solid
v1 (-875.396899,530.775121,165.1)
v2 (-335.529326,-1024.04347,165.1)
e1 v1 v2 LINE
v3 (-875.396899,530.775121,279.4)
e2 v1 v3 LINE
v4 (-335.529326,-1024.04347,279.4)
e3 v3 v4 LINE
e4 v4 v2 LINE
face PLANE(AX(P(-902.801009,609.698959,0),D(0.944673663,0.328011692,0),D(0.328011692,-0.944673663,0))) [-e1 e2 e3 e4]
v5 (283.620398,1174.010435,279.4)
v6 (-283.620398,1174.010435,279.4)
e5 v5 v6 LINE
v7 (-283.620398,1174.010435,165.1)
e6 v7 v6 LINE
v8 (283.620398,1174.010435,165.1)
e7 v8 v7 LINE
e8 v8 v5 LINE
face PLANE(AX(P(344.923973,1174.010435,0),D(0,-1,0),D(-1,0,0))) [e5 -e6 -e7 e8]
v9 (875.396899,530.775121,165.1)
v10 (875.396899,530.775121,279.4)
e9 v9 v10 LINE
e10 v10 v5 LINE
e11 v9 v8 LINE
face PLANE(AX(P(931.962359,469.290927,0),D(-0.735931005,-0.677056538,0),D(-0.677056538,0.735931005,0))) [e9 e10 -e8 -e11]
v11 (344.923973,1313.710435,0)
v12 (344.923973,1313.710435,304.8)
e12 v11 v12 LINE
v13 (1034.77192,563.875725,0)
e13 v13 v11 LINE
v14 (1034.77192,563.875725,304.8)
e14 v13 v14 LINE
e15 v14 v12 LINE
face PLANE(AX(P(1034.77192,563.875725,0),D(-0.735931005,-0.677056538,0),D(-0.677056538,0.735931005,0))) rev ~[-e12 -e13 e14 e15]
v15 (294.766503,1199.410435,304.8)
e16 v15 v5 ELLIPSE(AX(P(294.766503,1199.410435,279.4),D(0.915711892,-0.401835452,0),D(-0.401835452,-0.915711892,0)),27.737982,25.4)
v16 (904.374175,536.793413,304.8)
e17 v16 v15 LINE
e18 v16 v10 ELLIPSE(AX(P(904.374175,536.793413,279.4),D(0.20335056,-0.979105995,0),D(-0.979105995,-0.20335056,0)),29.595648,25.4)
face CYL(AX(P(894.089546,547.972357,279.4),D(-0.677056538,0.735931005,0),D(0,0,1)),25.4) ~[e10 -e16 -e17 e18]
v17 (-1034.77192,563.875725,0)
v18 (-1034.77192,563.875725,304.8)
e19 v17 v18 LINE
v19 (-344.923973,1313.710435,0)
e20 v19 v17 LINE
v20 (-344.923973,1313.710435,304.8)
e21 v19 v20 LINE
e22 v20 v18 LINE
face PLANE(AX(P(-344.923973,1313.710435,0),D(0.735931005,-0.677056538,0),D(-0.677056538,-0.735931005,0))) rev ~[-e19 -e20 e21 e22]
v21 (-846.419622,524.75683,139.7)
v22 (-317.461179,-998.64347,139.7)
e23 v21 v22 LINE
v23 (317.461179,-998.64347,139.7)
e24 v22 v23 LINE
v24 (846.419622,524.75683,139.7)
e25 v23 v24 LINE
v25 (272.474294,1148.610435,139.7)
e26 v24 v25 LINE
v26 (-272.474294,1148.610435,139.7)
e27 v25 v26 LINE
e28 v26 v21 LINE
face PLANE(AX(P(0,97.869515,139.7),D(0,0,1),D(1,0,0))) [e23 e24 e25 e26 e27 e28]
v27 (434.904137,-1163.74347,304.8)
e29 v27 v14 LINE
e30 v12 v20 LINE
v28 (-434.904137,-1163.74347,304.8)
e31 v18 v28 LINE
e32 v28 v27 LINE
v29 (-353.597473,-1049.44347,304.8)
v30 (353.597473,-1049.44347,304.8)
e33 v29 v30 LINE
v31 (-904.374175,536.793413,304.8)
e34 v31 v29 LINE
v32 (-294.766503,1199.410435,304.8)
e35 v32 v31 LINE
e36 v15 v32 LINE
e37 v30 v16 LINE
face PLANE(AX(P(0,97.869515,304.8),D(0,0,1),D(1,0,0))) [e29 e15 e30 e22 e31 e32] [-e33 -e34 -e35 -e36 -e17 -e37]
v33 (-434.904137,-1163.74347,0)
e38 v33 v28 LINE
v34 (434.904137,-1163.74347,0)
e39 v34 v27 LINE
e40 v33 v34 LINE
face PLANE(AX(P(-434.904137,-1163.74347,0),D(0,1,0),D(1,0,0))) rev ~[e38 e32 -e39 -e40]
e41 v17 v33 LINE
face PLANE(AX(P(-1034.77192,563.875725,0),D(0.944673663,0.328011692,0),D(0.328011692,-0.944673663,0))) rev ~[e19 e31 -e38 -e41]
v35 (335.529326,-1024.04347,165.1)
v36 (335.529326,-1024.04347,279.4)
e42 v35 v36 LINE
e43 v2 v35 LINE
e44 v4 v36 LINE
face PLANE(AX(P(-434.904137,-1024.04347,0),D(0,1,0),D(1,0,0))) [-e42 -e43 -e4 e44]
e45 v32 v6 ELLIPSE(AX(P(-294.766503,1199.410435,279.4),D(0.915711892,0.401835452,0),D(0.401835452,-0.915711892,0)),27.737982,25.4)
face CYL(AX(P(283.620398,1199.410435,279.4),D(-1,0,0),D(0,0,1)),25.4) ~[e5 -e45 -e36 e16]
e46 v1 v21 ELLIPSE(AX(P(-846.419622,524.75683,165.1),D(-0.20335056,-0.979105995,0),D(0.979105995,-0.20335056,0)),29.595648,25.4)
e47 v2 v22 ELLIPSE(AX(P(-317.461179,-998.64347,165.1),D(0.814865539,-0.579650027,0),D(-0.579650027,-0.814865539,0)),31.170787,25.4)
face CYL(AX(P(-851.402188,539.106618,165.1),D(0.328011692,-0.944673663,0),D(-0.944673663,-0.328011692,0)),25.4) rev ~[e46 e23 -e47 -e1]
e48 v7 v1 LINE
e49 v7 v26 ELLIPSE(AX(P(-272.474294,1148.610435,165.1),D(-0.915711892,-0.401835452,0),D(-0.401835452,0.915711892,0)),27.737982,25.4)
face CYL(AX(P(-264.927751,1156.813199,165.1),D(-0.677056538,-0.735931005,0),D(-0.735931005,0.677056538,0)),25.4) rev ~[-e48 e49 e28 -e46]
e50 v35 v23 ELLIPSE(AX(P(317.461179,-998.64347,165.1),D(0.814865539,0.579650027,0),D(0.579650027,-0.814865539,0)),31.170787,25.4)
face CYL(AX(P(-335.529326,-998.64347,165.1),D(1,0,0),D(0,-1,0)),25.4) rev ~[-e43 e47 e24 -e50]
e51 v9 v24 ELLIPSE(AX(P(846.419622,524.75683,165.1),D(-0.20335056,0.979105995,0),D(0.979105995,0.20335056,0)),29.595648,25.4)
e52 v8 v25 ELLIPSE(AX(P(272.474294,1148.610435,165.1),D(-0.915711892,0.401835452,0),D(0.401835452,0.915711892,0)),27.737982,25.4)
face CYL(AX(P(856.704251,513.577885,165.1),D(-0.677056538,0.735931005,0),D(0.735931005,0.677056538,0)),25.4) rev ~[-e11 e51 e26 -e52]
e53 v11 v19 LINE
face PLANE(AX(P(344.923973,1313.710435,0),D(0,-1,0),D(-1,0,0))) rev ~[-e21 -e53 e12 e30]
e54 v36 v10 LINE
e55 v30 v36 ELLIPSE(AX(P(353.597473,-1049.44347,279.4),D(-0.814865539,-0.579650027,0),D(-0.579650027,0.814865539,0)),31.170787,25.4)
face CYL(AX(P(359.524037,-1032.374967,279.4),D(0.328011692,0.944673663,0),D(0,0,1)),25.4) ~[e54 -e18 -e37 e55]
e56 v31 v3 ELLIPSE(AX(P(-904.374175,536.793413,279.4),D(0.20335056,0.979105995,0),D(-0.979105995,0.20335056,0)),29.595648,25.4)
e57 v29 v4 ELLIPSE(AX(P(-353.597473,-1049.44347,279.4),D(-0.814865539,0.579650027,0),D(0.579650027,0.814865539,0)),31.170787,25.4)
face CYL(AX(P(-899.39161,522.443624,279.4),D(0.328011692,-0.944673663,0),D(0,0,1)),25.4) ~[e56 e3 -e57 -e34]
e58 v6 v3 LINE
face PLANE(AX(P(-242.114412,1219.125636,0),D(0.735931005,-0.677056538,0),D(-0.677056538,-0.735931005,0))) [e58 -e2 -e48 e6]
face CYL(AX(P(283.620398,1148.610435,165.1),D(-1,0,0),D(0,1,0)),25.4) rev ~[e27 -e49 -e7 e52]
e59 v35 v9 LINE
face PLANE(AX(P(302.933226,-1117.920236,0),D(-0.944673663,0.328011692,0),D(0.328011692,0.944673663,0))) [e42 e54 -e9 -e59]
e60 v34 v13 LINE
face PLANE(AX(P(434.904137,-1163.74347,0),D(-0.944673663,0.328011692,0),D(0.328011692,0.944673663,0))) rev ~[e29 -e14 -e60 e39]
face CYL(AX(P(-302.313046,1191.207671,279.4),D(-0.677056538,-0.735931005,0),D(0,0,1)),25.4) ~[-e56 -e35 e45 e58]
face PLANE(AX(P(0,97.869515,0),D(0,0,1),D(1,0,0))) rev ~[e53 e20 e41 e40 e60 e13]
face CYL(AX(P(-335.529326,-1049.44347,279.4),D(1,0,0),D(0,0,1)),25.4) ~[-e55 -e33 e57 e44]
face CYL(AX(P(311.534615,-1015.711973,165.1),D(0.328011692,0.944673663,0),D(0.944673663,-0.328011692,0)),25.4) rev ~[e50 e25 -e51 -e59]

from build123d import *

# Parameters (mm, degrees)
F1_DEPTH = 304.8
F2_T     = -139.7
F3_R     = 25.4


# Not quite as in the source:
# - a feature of the source that left no trace in its solid (it failed there, or was rolled back) is left out


with BuildPart() as f1:
    # F0 (on Top) → F1 (new body)
    with BuildSketch(Plane.XY):
        Polygon((-434.9041368839, -1163.7434696012), (0, -1163.7434696012), (434.9041368839, -1163.7434696012), (1034.7719199285, 563.8757253794), (344.9239733095, 1313.7104347737), (0, 1313.7104347737), (-344.9239733095, 1313.7104347737), (-1034.7719199285, 563.8757253794), align=None)
    extrude(amount=F1_DEPTH)

    # F2
    f2_openings = [f1.faces().sort_by_distance(p)[0] for p in [
        (0, 124.086799, 304.8),
    ]]
    offset(amount=F2_T, openings=f2_openings)

    # F3
    f3_edges = [f1.edges().sort_by_distance(p)[0] for p in [
        (-579.508648, 852.392778, 304.8),
        (0, 1174.010435, 304.8),
        (579.508648, 852.392778, 304.8),
        (605.463112, -246.634174, 304.8),
        (0, -1024.04347, 304.8),
        (-605.463112, -246.634174, 304.8),
        (-605.463112, -246.634174, 139.7),
        (0, -1024.04347, 139.7),
        (605.463112, -246.634174, 139.7),
        (579.508648, 852.392778, 139.7),
        (0, 1174.010435, 139.7),
        (-579.508648, 852.392778, 139.7),
    ]]
    fillet(f3_edges, radius=F3_R)


solid = f1.part
